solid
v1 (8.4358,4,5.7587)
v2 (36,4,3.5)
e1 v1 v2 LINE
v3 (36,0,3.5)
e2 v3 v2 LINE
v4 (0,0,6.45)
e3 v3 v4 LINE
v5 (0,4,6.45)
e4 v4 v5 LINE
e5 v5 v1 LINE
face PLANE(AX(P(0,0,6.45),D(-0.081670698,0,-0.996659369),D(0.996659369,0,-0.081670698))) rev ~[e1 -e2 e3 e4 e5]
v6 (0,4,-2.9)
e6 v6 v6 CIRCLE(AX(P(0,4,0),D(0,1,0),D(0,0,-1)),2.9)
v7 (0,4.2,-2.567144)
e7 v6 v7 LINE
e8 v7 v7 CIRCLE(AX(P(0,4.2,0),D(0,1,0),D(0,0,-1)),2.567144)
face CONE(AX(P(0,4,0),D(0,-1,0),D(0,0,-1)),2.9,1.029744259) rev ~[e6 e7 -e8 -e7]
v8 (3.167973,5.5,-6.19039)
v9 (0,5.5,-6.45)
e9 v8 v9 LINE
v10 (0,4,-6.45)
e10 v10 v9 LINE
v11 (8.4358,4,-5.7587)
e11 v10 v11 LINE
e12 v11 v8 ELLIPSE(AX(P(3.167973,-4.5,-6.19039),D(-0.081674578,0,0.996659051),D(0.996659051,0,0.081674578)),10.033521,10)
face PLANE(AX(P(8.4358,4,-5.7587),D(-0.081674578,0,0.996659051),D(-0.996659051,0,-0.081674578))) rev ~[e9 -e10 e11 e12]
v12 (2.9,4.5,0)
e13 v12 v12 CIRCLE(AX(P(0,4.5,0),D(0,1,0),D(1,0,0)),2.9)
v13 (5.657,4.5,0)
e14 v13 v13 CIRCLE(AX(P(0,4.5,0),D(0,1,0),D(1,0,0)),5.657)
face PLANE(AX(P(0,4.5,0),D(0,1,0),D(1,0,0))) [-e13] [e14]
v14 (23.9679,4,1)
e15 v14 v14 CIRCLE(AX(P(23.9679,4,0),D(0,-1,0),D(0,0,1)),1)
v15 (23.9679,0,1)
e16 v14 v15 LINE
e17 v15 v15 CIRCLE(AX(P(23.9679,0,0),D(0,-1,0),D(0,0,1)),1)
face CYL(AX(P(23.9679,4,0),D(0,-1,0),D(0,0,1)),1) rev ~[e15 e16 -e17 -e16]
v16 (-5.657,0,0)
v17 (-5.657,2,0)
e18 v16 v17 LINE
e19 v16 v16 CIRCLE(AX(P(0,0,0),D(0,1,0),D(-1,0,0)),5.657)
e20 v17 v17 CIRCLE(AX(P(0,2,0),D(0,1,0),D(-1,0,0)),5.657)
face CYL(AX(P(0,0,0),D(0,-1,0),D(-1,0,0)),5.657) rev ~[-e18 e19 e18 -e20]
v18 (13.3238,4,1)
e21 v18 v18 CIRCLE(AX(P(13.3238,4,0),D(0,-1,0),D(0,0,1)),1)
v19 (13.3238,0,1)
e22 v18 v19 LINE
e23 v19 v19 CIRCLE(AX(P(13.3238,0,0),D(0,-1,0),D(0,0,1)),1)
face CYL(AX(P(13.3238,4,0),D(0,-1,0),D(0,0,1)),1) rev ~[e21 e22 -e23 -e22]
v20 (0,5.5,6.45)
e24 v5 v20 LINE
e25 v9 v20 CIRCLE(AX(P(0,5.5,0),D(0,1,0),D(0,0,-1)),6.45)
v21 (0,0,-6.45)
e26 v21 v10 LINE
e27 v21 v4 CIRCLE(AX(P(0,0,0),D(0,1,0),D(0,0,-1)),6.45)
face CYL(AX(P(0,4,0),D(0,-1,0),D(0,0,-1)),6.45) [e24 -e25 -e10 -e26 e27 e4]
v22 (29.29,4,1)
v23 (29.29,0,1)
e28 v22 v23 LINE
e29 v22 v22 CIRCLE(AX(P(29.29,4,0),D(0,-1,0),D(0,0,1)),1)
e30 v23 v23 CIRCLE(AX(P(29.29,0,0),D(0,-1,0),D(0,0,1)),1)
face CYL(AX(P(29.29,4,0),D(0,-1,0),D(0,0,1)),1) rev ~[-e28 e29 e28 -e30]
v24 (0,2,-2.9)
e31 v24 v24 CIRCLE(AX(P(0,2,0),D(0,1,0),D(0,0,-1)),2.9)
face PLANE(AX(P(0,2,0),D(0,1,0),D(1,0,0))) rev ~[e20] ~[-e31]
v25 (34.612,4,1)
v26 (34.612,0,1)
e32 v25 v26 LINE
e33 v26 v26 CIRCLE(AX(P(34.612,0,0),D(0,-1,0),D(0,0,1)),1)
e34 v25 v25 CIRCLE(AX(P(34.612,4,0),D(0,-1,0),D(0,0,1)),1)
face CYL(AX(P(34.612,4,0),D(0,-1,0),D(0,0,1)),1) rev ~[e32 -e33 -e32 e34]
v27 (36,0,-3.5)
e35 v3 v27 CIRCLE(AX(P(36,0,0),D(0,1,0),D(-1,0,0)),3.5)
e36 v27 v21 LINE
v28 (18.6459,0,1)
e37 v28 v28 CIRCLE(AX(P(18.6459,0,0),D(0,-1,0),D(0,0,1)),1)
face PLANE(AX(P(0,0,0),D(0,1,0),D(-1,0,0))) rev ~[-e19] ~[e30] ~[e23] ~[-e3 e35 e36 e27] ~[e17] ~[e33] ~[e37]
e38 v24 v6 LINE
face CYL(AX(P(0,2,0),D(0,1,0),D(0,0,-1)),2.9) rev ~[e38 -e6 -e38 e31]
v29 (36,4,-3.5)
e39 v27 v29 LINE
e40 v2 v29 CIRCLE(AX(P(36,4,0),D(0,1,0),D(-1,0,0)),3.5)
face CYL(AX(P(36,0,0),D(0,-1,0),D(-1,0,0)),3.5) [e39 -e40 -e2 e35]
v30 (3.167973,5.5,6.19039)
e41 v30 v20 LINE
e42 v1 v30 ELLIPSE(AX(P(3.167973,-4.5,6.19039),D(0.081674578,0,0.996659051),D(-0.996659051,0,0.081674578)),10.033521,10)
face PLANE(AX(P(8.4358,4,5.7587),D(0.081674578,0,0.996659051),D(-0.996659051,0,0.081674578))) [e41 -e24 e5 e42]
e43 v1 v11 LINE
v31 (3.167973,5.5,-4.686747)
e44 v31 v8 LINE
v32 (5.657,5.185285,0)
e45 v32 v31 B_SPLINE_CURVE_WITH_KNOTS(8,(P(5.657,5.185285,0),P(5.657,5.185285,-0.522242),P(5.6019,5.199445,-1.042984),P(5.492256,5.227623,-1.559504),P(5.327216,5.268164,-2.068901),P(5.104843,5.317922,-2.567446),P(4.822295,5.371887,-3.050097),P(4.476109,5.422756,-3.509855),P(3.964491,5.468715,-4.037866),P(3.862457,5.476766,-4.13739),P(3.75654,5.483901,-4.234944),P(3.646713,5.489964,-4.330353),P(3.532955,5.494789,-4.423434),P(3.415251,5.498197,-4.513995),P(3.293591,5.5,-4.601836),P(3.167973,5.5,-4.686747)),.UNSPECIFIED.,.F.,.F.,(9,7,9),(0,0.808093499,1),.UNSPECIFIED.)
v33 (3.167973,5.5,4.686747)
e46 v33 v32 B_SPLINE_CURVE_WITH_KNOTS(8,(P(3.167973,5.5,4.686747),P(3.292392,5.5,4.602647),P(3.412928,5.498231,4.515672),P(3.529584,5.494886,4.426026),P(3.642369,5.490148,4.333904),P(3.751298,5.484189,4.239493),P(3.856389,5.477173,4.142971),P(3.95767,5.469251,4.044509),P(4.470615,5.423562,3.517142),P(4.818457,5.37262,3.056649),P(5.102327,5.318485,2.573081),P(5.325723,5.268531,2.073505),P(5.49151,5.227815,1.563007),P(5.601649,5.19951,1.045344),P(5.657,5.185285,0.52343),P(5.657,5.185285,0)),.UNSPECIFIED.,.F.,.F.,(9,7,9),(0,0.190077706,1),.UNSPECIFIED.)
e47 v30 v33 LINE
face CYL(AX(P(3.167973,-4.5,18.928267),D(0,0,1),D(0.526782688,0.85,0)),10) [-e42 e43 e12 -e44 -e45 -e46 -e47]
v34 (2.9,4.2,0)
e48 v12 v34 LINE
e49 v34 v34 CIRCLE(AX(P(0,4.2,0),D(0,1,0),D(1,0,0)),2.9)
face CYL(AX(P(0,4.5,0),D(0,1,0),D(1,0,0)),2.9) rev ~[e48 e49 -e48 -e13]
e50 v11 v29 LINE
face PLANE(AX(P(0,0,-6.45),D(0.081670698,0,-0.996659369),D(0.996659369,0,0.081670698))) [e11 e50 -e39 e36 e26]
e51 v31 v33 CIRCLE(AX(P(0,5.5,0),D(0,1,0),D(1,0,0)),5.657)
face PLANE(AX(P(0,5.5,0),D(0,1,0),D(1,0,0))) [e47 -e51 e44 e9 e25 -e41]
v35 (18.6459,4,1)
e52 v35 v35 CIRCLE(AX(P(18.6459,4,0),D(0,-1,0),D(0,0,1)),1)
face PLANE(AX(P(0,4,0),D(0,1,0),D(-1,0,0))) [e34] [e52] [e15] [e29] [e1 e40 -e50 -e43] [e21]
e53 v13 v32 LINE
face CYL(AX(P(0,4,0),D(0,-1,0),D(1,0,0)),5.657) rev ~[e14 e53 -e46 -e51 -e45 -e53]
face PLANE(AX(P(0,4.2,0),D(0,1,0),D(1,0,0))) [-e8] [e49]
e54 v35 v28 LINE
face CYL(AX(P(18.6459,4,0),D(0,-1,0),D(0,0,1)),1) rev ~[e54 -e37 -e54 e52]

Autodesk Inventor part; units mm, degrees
ref_plane "YZ Plane" through (0, 0, 0) normal (1, 0, 0) x (0, 1, 0)
ref_plane "XZ Plane" through (0, 0, 0) normal (0, 1, 0) x (-1, 0, 0)
ref_plane "XY Plane" through (0, 0, 0) normal (0, 0, 1) x (1, 0, 0)
sketch "Sketch1" plane through (0, 0, 0) normal (0, 1, 0) x (-1, 0, 0)
  circle A0 centre (0, 0) radius 6.45
  circle A1 centre (0, 0) radius 5.657
  circle A2 centre (0, 0) radius 2.85
  circle A3 centre (0, 0) radius 1.25
  line L0 (0, 0) -> (-36, 0)
  circle A4 centre (-36, 0) radius 3.5
  line L1 (0, 6.45) -> (-36, 3.5)
  line L2 (0, -6.45) -> (-36, -3.5)
  dimension "d0" = 12.9
  dimension "d1" = 11.314
  dimension "d2" = 5.7
  dimension "d3" = 2.5
  dimension "d4" = 36
  dimension "d5" = 7
extrude "Extrusion1" add sketch "Sketch1" along normal blind 4 contours A0 L2 L1 | A0 L0 A4 L1 | L2 A4 L0 A0 | A4
sketch "Sketch2" plane through (0, 4, 0) normal (0, 1, 0) x (1, 0, 0)
  line L0 (8.4358, -5.7587) -> (8.4358, 5.7587)
  line L1 (8.4358, -5.7587) -> (0, -6.45)
  line L2 (0, -6.45) -> (36, -3.5) projected
  line L3 (8.4358, 5.7587) -> (0, 6.45)
  line L4 (36, 3.5) -> (0, 6.45) projected
  arc A0 (0, 6.45) -> (0, -6.45) centre (0, 0) ccw
  arc A1 (0, 6.45) -> (0, -6.45) centre (0, 0) ccw projected
  circle A2 centre (0, 0) radius 5.657
extrude "Extrusion2" add sketch "Sketch2" along normal blind 1.5
fillet "Fillet1" radius 10 1 edges at (8.4358, 5.5, 0)
sketch "Sketch4" plane through (0, 4, 0) normal (0, 1, 0) x (1, 0, 0)
  circle A0 centre (0, 0) radius 2.9
  dimension "d11" = 5.8
sketch "Sketch5" plane through (0, 4, 0) normal (0, 1, 0) x (1, 0, 0)
  circle A0 centre (0, 0) radius 5.657
extrude "Extrusion3" add sketch "Sketch5" along normal blind 0.5 and the other way blind 2
sketch "Sketch6" plane through (0, 4.5, 0) normal (0, 1, 0) x (1, 0, 0)
  circle A0 centre (0, 0) radius 2.9
  dimension "d17" = 5.8
hole "Hole1" at (0, 4, 0) direction (0, -1, 0) diameter 3 end through all
sketch "Sketch7" plane through (0, 2, 0) normal (0, -1, 0) x (1, 0, 0)
  circle A0 centre (0, 0) radius 2.9
  dimension "d27" = 5.8
hole "Hole2" at (0, 2, 0) direction (0, 1, 0) diameter 5.8 depth 2 tip angle 118
sketch "Sketch9" plane through (0, 4, 0) normal (0, 1, 0) x (1, 0, 0)
  line L0 (8.4358, 5.7587) -> (8.4358, -5.7587) projected
  arc A0 (36, -3.5) -> (36, 3.5) centre (36, 0) ccw projected
  circle A1 centre (23.9679, 0) radius 1
  circle A2 centre (34.612, 0) radius 1
  line L1 (0, -6.45) -> (36, -3.5) projected
  circle A3 centre (29.29, 0) radius 1
  circle A4 centre (13.3238, 0) radius 1
  circle A5 centre (18.6459, 0) radius 1
  point P0 (0, 0)
hole "Hole4" at (13.3238, 4, 0) at (18.6459, 4, 0) at (23.9679, 4, 0) at (29.29, 4, 0) at (34.612, 4, 0) direction (0, -1, 0) diameter 2 end through all
extrude "Extrusion5" cut sketch "Sketch6" against normal blind 0.3
properties part number "servo_arm"
